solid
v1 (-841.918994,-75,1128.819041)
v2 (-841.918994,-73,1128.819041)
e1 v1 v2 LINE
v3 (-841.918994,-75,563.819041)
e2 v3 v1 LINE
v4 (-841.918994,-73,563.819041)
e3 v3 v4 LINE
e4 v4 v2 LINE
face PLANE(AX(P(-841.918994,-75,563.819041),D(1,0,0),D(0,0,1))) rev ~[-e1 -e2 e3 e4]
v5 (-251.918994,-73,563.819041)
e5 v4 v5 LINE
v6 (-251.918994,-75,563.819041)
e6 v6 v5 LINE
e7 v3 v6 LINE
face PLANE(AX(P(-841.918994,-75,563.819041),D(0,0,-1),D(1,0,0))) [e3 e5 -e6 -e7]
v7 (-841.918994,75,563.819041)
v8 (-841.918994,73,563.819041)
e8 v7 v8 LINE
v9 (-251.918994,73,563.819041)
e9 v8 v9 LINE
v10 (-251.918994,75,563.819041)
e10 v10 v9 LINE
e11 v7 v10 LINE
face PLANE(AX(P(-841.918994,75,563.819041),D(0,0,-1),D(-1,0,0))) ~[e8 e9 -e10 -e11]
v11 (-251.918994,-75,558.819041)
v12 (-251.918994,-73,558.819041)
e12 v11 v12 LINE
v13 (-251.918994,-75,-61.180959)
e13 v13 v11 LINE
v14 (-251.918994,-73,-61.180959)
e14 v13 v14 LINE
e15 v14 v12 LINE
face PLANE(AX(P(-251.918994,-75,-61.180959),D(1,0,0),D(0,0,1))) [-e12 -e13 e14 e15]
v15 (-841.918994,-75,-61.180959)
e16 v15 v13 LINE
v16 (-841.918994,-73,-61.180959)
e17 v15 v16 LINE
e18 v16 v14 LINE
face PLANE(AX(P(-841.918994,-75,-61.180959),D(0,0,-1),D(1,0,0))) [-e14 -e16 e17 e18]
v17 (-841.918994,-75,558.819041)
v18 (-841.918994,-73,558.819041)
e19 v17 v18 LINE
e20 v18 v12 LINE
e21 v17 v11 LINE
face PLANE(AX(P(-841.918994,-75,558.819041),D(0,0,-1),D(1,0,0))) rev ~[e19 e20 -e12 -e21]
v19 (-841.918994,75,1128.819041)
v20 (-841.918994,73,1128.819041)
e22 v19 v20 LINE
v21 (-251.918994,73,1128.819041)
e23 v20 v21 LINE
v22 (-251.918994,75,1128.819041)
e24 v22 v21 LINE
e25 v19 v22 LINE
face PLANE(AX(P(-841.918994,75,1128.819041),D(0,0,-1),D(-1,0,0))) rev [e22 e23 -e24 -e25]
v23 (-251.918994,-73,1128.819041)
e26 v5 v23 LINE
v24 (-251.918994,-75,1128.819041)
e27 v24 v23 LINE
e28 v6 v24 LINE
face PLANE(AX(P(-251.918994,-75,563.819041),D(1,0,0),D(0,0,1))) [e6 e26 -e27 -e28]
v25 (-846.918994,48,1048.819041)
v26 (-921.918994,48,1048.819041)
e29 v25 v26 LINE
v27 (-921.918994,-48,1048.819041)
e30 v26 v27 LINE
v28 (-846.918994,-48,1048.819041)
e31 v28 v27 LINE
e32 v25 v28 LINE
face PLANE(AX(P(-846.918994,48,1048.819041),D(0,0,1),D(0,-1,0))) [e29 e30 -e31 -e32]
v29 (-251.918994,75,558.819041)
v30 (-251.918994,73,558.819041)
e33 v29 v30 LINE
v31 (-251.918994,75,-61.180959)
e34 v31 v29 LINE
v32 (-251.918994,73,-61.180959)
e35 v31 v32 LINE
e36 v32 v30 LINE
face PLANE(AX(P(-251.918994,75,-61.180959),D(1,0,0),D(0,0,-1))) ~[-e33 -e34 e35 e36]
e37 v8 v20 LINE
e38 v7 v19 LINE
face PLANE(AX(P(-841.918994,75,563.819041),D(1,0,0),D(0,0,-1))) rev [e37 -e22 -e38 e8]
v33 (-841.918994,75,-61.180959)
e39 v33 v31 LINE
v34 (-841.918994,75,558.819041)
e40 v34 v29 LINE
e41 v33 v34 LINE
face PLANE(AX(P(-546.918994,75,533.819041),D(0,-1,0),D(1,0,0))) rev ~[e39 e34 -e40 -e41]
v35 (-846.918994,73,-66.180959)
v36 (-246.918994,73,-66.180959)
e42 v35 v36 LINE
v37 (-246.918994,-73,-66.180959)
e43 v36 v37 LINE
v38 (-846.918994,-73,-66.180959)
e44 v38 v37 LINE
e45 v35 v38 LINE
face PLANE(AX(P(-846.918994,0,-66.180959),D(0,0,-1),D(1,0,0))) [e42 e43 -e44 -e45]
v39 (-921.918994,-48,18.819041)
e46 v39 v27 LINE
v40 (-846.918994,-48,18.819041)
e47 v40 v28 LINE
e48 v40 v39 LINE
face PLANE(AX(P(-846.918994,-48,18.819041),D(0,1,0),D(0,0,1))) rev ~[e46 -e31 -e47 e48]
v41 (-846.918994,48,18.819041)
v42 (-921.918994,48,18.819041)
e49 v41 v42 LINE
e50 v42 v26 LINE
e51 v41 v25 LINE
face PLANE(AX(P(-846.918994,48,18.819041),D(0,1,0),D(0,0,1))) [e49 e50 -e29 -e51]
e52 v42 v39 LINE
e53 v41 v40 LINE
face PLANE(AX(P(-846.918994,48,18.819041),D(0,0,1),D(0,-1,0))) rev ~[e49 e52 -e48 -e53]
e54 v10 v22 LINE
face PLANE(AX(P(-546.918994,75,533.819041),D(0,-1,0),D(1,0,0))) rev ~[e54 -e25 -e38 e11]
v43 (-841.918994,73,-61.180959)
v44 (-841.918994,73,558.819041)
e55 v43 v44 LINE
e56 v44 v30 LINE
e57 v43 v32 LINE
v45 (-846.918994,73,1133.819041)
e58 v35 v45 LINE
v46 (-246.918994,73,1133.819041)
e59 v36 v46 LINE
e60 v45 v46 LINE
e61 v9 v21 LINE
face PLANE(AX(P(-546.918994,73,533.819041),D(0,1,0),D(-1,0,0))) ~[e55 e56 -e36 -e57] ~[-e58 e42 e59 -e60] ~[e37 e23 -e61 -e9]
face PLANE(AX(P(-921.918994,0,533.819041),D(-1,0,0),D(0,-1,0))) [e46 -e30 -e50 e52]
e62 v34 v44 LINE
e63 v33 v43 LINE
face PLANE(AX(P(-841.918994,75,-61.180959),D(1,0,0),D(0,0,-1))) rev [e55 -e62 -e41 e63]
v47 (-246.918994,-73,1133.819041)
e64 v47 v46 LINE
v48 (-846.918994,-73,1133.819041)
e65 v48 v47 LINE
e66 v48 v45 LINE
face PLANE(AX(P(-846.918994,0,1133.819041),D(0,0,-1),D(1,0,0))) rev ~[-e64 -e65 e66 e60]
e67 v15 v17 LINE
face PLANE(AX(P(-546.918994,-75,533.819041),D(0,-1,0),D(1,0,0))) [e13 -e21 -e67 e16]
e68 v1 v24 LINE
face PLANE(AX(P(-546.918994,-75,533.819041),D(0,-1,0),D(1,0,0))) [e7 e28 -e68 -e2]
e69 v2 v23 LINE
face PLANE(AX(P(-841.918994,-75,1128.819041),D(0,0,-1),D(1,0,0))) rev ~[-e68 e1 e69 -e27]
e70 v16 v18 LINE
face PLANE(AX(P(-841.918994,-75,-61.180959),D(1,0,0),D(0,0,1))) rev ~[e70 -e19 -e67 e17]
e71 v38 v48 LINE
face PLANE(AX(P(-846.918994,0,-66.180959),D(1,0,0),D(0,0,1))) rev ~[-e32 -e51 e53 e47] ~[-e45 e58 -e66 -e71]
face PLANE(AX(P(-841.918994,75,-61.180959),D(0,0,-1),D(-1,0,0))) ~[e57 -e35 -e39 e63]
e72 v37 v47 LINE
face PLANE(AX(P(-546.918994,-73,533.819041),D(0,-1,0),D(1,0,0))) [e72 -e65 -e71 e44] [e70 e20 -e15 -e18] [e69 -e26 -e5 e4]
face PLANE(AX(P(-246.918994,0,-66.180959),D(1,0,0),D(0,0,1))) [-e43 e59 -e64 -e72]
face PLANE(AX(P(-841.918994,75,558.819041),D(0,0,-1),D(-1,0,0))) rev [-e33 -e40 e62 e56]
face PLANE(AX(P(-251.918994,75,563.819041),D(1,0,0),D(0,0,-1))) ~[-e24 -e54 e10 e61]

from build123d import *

# Parameters (mm, degrees)
F0_W     = 600
F0_H     = 1200
F1_DEPTH = 75
F2_W     = 600
F2_H     = 1200
F2_W_2   = 590
F2_H_2   = 620
F2_H_3   = 565
F3_DEPTH = 2
F4_W     = 96
F4_H     = 1030
F5_DEPTH = 75


# Not quite as in the source:
# - a pattern or mirror of a feature is missing from the dataset's text; its kind, count and spacing are read off the source's solid


with BuildPart() as f1:
    # F0 (on Front) → F1 (new body, symmetric)
    with BuildSketch(Plane.XZ):
        with Locations((-546.9189941883, 533.8190406561)):
            Rectangle(F0_W, F0_H)
    extrude(amount=F1_DEPTH, both=True)

    # F2 (on face) → F3 (cut)
    with BuildSketch(Plane.XZ.offset(75)):
        with Locations((-546.9189941883, 533.8190406561)):
            Rectangle(F2_W, F2_H)
        with Locations((-546.9189941883, 248.8190406561)):
            Rectangle(F2_W_2, F2_H_2, mode=Mode.SUBTRACT)
        with Locations((-546.9189941883, 846.3190406561)):
            Rectangle(F2_W_2, F2_H_3, mode=Mode.SUBTRACT)
    f3 = extrude(amount=-F3_DEPTH, mode=Mode.SUBTRACT)

    # F3_copies: F3 across plane
    add(f3.mirror(Plane.ZX), mode=Mode.SUBTRACT)

    # F4 (on face) → F5 (join)
    with BuildSketch(Plane(origin=(-846.9189941883, 0, 0), x_dir=(0, -1, 0), z_dir=(-1, 0, 0))):
        with Locations((0, 533.8190406561)):
            Rectangle(F4_W, F4_H)
    extrude(amount=F5_DEPTH)


solid = f1.part
